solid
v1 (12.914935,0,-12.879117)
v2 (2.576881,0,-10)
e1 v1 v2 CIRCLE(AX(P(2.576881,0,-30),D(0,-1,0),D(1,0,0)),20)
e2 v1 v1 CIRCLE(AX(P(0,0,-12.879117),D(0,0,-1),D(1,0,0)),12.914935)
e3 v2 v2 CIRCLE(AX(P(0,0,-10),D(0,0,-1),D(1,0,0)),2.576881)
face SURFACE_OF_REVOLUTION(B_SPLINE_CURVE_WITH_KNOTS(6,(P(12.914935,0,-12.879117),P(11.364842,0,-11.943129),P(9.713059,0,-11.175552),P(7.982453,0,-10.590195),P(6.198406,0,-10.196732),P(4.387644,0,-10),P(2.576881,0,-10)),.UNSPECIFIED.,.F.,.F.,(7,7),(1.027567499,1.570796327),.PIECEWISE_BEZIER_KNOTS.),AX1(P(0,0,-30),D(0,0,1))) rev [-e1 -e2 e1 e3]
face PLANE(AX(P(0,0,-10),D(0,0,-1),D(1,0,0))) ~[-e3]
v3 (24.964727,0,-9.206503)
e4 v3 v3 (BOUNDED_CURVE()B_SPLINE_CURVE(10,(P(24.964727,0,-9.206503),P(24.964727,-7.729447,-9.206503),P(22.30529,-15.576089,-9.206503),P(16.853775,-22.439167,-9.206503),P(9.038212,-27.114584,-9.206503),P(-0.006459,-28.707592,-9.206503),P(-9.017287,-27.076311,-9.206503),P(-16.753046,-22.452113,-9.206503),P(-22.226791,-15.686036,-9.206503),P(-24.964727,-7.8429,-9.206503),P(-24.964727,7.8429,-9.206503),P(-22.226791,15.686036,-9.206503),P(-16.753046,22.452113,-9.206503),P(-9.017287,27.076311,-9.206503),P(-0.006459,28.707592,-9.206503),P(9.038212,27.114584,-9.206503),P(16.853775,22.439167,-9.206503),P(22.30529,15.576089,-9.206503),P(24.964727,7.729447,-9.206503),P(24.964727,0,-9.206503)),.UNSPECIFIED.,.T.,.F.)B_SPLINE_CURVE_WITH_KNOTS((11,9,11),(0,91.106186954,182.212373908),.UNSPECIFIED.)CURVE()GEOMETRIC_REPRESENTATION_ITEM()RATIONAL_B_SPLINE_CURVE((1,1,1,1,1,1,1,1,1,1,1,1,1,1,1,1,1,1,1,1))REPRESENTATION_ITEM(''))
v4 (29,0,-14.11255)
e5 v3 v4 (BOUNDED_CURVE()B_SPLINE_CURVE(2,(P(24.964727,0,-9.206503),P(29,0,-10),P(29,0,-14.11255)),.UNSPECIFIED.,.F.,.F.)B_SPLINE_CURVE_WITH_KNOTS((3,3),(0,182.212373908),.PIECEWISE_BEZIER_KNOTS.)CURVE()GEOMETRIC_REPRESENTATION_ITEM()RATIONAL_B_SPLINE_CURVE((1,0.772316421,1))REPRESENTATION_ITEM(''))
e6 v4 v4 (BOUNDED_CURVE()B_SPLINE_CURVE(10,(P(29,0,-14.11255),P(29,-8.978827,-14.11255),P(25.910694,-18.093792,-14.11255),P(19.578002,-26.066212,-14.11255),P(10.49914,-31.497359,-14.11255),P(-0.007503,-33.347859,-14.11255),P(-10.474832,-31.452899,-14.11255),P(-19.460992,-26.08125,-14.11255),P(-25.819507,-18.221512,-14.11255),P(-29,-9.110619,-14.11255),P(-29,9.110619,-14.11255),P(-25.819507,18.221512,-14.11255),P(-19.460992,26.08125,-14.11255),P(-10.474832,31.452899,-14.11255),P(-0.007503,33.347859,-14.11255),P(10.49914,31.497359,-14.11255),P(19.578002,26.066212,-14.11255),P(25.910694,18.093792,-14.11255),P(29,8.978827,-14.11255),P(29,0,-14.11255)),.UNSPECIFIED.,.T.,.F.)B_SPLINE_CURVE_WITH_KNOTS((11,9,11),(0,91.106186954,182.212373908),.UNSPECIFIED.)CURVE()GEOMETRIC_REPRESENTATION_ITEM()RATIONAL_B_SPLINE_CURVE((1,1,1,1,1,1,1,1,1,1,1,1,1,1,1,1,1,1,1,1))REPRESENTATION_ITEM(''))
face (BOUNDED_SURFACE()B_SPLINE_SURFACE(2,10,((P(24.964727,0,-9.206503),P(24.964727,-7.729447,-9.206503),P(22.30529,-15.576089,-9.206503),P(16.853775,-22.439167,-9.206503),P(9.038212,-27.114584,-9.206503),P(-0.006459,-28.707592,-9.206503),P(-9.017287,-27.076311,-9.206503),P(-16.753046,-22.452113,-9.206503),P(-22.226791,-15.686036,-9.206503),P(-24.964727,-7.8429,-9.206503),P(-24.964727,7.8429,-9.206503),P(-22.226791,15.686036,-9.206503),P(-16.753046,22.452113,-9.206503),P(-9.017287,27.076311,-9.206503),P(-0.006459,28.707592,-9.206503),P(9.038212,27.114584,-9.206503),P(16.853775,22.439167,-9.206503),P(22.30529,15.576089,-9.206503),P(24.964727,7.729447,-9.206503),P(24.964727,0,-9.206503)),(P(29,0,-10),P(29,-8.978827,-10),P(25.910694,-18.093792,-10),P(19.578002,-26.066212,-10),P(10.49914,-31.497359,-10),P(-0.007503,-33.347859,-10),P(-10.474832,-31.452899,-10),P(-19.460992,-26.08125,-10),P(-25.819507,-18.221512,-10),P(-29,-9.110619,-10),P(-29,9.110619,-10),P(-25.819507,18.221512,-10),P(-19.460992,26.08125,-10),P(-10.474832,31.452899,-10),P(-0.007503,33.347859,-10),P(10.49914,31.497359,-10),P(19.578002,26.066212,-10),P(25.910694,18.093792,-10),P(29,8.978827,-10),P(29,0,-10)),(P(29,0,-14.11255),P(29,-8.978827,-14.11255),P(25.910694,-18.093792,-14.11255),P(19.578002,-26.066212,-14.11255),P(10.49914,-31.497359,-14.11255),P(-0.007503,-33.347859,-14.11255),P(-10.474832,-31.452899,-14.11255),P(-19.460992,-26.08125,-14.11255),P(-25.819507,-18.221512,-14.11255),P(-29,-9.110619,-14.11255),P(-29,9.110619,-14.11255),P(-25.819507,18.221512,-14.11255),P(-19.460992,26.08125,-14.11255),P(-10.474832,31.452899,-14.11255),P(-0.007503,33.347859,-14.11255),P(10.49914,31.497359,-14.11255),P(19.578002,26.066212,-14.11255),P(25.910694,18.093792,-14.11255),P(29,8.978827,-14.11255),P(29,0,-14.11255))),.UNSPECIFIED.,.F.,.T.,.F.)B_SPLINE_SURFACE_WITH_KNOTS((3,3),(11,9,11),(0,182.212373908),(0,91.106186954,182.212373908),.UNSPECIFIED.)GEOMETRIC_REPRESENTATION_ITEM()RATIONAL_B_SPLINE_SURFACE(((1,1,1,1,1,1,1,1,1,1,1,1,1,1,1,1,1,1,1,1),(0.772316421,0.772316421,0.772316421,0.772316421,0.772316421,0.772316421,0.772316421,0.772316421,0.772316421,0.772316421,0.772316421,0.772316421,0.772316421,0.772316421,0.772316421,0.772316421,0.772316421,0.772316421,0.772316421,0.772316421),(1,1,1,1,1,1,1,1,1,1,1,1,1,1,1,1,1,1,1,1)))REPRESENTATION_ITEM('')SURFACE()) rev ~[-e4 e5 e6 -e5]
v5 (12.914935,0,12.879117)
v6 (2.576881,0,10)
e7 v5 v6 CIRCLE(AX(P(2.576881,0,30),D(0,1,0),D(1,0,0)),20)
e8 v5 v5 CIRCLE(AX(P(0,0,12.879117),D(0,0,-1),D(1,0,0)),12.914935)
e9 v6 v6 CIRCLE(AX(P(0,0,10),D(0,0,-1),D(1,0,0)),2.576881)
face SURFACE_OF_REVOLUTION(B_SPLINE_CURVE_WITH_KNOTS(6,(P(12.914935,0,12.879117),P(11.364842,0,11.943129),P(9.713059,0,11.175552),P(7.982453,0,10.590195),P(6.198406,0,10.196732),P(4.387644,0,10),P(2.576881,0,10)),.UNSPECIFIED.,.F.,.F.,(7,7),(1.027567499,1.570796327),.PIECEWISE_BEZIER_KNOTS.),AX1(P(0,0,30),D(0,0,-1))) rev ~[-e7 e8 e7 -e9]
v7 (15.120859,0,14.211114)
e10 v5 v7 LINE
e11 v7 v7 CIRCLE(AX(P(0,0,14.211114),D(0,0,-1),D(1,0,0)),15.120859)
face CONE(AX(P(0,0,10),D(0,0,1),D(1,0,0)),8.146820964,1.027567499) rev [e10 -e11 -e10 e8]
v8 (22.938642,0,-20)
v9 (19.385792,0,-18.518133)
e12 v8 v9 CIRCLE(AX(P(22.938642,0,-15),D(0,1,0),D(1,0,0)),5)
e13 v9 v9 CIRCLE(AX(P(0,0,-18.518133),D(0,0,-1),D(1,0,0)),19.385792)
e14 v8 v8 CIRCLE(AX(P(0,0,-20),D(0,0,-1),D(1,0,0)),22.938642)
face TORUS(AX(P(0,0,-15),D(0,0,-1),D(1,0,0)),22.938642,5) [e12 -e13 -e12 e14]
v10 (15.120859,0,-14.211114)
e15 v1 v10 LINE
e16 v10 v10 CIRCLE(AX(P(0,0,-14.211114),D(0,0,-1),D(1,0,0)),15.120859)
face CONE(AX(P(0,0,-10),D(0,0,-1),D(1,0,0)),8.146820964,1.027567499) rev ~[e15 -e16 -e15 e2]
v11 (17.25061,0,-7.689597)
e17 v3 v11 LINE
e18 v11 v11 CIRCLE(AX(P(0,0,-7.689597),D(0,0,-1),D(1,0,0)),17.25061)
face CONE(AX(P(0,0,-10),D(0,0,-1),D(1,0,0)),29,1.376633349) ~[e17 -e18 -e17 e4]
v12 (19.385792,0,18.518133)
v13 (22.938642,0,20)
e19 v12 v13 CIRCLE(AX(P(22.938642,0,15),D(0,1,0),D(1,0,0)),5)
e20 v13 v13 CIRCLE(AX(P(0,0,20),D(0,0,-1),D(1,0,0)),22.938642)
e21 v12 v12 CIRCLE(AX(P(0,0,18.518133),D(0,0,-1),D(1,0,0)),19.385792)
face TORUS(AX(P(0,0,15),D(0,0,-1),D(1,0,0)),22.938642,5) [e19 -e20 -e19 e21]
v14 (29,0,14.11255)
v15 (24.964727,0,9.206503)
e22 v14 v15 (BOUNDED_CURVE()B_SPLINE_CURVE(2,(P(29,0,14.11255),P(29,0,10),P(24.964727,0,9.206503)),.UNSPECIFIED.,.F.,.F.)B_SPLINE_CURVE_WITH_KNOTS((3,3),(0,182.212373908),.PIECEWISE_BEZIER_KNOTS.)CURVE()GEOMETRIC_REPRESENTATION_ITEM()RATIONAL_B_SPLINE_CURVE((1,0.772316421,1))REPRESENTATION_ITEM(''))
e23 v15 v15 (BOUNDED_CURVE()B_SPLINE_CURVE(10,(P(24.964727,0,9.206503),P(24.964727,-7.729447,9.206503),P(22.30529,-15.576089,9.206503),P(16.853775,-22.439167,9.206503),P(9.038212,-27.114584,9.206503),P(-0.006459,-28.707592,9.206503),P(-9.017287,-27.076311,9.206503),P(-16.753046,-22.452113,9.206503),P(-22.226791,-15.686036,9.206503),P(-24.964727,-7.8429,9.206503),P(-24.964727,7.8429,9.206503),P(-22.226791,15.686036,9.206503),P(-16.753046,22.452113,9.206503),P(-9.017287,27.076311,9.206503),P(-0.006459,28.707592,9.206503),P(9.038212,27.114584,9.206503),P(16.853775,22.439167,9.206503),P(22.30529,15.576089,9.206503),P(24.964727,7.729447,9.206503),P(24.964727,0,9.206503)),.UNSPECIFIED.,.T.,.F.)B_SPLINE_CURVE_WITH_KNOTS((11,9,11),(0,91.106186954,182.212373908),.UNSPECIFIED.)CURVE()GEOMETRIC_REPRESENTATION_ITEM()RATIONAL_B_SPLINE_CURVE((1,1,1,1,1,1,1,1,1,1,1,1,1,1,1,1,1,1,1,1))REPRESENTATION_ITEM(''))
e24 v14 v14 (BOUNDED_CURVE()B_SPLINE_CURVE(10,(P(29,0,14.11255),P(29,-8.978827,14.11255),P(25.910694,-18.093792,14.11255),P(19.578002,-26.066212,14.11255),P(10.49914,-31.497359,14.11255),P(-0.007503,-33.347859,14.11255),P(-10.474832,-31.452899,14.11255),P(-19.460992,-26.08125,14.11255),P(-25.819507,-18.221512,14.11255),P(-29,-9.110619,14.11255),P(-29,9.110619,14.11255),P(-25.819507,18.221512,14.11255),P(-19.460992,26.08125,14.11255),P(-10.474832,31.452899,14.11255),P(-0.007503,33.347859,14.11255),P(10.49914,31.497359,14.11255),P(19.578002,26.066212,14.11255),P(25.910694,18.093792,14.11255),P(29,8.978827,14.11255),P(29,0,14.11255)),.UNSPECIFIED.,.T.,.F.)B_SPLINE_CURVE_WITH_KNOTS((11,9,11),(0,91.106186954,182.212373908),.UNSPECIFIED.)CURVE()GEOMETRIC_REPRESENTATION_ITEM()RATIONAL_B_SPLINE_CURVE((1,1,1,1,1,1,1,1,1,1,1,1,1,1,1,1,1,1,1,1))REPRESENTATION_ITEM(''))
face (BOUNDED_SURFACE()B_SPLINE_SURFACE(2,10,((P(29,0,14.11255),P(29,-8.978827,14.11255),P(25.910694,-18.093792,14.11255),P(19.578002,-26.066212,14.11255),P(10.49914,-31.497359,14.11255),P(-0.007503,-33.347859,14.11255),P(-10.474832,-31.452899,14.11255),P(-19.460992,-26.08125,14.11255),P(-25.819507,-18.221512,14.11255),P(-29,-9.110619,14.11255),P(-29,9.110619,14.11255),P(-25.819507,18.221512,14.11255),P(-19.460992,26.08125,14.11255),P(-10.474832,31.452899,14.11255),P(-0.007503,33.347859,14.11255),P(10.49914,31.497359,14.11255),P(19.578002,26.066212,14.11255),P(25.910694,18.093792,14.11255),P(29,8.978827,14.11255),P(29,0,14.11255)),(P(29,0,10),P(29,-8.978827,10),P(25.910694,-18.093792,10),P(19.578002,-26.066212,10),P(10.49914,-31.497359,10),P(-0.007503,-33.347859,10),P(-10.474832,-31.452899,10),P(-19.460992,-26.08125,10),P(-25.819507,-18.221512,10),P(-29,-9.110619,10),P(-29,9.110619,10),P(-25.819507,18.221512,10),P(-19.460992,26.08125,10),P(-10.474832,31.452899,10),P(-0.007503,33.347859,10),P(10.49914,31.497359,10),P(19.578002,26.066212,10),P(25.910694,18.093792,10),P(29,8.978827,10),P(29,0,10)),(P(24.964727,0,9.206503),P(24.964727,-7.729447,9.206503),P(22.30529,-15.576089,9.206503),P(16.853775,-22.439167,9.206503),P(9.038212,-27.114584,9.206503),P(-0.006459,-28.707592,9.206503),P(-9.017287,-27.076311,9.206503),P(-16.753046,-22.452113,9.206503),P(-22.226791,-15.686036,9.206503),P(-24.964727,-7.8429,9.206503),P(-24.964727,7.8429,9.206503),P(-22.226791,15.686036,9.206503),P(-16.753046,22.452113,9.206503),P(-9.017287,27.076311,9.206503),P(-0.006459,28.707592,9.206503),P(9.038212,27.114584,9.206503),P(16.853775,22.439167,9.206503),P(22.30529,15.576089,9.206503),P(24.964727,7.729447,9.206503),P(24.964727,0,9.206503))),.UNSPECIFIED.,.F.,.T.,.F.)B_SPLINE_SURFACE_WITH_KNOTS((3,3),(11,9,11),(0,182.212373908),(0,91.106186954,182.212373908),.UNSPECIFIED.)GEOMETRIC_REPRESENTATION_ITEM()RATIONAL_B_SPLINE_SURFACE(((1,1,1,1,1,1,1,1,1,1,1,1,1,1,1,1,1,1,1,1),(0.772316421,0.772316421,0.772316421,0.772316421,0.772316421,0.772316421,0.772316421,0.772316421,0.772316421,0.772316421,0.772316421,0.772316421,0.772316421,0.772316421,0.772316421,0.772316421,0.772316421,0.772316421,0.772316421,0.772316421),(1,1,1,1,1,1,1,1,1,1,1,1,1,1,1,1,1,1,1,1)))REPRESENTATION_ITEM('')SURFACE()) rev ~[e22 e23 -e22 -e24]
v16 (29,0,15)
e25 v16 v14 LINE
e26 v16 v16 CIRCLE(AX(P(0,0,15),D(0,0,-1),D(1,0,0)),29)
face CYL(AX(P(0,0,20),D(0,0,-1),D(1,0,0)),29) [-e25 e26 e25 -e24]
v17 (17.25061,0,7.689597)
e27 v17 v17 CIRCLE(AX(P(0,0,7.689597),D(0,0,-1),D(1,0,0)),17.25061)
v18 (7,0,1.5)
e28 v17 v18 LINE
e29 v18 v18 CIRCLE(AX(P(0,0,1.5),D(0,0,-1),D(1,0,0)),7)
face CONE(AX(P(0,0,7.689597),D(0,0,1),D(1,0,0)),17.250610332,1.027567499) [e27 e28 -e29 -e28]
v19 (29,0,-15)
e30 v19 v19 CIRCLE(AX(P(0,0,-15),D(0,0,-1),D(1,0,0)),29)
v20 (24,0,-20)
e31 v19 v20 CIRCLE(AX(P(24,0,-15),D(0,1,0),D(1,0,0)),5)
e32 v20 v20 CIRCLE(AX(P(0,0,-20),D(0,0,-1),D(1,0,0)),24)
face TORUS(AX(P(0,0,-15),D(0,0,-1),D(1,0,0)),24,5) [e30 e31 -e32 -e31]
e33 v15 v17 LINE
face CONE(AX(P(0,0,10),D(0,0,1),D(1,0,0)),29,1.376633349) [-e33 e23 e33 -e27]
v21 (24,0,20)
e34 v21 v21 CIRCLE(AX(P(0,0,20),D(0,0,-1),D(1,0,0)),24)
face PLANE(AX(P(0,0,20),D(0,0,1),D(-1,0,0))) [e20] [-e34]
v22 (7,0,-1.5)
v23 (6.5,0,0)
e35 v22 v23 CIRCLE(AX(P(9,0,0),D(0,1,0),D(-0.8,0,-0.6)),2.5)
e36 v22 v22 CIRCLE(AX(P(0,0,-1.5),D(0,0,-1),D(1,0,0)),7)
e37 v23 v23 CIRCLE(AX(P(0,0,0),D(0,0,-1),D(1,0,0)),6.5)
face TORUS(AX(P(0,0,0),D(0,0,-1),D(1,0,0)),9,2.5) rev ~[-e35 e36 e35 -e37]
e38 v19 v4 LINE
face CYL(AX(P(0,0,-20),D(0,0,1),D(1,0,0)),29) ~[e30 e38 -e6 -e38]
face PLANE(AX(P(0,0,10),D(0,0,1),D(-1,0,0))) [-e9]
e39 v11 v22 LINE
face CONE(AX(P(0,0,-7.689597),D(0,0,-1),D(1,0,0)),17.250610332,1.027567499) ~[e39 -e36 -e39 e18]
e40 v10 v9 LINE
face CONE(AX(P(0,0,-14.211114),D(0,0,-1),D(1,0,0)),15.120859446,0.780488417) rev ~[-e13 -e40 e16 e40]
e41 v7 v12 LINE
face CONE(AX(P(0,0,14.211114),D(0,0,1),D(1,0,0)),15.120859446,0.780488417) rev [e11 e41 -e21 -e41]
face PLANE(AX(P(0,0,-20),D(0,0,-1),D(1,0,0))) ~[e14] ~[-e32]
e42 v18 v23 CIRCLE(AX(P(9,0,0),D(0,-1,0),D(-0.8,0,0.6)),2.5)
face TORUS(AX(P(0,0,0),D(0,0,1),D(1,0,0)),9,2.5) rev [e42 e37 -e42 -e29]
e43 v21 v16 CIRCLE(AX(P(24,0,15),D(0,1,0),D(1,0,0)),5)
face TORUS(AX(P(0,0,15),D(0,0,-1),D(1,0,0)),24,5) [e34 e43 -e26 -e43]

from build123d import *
from build123d import SkipClean  # not in build123d's __all__

# Parameters (mm, degrees)
F2_R = 5
F3_R = 20


# Not quite as in the source:
# - a pattern or mirror of a feature is missing from the dataset's text; its kind, count and spacing are read off the source's solid


with BuildPart() as f1:
    # F0 (on Front) → F1 (revolve)
    with BuildSketch(Plane.XZ):
        with BuildLine():
            Line((6.5, 0), (0, 0))
            Line((0, 0), (0, -10))
            Line((0, -10), (8.146820964, -10))
            Line((8.146820964, -10), (15.1208594459, -14.2111137569))
            Line((15.1208594459, -14.2111137569), (20.853179036, -20))
            Line((20.853179036, -20), (29, -20))
            Line((29, -20), (29, -10))
            Line((29, -10), (17.250610332, -7.6895967878))
            Line((17.250610332, -7.6895967878), (7, -1.5))
            ThreePointArc((7, -1.5), (6.6282917549, -0.790569415), (6.5, 0))
        make_face()
    revolve(axis=Axis((0, 0, -5), (0, 0, -1)))

    # F1_copies: F1 across plane


with BuildPart() as f1_1:
    add(f1.part, clean=False)
    with SkipClean():  # cleaning this boolean's faces spoils the solid; the shape is the same uncleaned
        add(f1.part.mirror(Plane.XY), clean=False)

    # F2
    f2_edges = [f1_1.edges().sort_by_distance(p)[0] for p in [
        (-29, 0, -10),
        (-29, 0, -20),
        (-20.853179, 0, -20),
        (-29, 0, 10),
        (-29, 0, 20),
        (-20.853179, 0, 20),
    ]]
    fillet(f2_edges, radius=F2_R)

    # F3
    f3_edges = [f1_1.edges().sort_by_distance(p)[0] for p in [
        (-8.146821, 0, -10),
        (-8.146821, 0, 10),
    ]]
    fillet(f3_edges, radius=F3_R)


solid = f1_1.part
